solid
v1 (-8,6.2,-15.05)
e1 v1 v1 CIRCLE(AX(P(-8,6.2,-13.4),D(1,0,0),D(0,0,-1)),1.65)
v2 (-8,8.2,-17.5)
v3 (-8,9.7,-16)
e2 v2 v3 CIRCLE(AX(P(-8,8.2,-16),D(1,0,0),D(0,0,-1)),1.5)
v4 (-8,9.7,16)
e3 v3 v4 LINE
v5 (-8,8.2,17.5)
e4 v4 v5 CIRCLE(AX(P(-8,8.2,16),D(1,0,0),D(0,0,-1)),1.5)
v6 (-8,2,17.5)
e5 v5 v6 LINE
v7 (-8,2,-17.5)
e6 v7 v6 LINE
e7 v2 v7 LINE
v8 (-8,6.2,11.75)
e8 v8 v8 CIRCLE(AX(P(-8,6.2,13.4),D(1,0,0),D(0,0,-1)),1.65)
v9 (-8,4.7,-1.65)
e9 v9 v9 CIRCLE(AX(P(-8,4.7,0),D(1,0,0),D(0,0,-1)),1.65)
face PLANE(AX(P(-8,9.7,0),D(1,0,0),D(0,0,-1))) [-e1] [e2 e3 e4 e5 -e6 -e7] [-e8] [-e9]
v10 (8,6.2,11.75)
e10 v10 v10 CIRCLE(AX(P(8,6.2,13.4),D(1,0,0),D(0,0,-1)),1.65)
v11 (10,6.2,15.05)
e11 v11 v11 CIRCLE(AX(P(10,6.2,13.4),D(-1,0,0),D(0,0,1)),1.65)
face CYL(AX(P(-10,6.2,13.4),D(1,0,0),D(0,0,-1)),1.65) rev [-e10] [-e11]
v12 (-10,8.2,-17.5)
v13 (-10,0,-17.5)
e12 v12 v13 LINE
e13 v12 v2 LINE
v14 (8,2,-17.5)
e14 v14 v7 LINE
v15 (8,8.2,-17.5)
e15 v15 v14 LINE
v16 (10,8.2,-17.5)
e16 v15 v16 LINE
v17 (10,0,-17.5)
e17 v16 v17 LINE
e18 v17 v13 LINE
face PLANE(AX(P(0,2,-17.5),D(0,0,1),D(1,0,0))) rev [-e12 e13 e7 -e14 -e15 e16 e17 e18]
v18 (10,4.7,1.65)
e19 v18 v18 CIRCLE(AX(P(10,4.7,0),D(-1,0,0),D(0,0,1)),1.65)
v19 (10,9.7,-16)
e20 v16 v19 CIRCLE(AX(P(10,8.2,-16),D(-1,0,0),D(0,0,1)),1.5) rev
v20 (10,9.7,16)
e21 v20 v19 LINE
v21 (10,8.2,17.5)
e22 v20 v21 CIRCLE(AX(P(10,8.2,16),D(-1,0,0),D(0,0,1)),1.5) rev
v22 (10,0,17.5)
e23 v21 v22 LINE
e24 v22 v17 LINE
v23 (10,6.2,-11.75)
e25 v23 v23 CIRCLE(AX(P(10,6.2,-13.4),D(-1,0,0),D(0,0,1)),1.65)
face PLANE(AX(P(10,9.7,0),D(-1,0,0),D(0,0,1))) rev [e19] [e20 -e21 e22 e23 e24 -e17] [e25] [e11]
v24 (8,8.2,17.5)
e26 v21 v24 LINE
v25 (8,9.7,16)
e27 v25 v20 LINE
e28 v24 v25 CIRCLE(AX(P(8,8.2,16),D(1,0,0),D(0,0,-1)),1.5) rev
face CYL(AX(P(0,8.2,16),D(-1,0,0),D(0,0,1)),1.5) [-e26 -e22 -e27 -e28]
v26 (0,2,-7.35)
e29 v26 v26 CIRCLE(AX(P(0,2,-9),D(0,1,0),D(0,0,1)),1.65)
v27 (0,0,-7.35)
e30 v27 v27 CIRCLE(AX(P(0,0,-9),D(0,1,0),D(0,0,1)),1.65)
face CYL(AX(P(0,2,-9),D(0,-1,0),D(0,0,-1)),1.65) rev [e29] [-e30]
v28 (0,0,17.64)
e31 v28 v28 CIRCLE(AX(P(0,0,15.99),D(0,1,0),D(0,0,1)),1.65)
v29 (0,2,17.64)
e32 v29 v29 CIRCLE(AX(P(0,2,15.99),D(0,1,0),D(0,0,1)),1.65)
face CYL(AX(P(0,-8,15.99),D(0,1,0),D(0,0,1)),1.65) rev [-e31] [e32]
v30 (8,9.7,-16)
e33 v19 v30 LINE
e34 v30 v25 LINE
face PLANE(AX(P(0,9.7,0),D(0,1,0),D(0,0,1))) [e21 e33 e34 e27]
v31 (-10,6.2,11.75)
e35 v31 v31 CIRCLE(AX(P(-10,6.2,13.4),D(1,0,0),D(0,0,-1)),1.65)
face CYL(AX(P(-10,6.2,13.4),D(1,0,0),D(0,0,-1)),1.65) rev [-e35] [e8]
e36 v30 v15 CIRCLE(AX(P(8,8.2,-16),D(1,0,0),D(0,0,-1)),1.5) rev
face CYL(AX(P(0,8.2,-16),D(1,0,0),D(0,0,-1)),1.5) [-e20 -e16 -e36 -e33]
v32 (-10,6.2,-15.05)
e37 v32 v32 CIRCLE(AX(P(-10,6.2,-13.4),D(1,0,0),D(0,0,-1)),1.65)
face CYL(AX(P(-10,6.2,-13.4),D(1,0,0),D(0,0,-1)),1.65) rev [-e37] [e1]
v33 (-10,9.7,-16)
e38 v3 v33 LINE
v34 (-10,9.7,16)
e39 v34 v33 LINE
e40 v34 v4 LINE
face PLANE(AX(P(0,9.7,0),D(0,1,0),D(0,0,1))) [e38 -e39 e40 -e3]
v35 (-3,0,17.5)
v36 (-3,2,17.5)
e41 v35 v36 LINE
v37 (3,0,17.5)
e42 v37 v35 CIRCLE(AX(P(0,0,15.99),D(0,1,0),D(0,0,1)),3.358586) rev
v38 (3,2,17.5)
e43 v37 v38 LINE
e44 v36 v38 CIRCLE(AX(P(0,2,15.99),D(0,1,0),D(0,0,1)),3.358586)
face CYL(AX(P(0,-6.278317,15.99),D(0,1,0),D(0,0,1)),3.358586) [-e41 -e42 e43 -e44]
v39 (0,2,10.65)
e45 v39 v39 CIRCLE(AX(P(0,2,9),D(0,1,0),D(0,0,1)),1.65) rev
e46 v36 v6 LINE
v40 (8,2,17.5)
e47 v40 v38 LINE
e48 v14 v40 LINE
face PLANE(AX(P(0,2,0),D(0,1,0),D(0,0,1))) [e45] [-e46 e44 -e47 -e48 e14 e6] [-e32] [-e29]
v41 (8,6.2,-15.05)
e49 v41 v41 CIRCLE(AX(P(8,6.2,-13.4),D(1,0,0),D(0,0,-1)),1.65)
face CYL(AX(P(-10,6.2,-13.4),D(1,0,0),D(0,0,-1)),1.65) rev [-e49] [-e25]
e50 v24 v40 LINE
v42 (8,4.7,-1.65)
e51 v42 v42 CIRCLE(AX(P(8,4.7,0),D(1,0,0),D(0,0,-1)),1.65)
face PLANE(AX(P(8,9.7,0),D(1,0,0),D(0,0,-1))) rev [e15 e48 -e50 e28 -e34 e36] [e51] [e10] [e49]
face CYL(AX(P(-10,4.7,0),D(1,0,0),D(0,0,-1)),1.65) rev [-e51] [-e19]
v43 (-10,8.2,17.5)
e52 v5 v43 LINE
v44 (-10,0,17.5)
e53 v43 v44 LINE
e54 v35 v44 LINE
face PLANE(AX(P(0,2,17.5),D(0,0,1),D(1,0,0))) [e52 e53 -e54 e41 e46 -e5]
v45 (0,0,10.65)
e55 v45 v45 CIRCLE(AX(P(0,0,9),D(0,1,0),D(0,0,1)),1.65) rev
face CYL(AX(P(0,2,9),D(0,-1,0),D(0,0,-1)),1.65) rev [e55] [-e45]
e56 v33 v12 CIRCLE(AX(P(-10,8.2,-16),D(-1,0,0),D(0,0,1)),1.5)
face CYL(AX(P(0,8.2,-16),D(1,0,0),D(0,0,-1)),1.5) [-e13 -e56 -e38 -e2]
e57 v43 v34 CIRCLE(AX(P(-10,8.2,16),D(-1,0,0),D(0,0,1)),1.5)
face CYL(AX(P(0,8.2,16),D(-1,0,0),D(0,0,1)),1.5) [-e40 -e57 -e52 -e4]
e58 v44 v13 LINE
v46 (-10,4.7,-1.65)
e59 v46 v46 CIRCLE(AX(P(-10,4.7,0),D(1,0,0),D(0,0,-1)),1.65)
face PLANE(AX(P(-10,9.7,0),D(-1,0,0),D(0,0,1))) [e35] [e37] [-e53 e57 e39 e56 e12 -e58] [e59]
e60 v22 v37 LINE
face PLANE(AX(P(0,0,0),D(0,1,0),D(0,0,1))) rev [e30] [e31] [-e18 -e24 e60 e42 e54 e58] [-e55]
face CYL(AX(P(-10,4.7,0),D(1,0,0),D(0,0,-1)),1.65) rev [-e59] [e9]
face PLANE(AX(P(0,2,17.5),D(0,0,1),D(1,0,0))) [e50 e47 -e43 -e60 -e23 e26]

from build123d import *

# Parameters (mm, degrees)
IZIM1_W                     = 16
IZIM1_H                     = 35
IZIM1_R                     = 1.65
Y_KSEKLIK_EKSTR_ZYON1_DEPTH = 2
IZIM3_W                     = 2
IZIM3_H                     = 35
Y_KSEKLIK_EKSTR_ZYON2_DEPTH = 9.7
RADYUS1_R                   = 1.5
KES_EKSTR_ZYON1_DEPTH       = 2
KES_EKSTR_ZYON1_2_DEPTH     = 2
KES_EKSTR_ZYON1_START       = -20
KES_EKSTR_ZYON1_3_OUTLINE_R = 1.65
KES_EKSTR_ZYON1_3_DEPTH     = 20


# Read off the part's stored shape, not the designer's step: Kes-Ekstrüzyon1
with BuildPart() as part:
    # Çizim1 → Yükseklik-Ekstrüzyon1 (new body)
    with BuildSketch(Plane(origin=(0, 0, 0), x_dir=(1, 0, 0), z_dir=(0, 1, 0))):
        Rectangle(IZIM1_W, IZIM1_H)
        with Locations(Location((0, -9, 0), (0, 0, 270))):
            Circle(IZIM1_R, mode=Mode.SUBTRACT)
        with Locations(Location((0, 9, 0), (0, 0, 270))):
            Circle(IZIM1_R, mode=Mode.SUBTRACT)
    extrude(amount=Y_KSEKLIK_EKSTR_ZYON1_DEPTH)

    # Çizim3 → Yükseklik-Ekstrüzyon2 (add)
    with BuildSketch(Plane(origin=(0, 0, 0), x_dir=(1, 0, 0), z_dir=(0, 1, 0))):
        with Locations((9, 0)):
            Rectangle(IZIM3_W, IZIM3_H)
        with Locations((-9, 0)):
            Rectangle(IZIM3_W, IZIM3_H)
    extrude(amount=Y_KSEKLIK_EKSTR_ZYON2_DEPTH)

    # Radyus1
    radyus1_edges = [part.edges().sort_by_distance(p)[0] for p in [
        (9, 9.7, 17.5),
        (9, 9.7, -17.5),
        (-9, 9.7, 17.5),
        (-9, 9.7, -17.5),
    ]]
    fillet(radyus1_edges, radius=RADYUS1_R)

    # Kes-Ekstrüzyon1 outline → Kes-Ekstrüzyon1 (add)
    with BuildSketch(Plane(origin=(0, 0, 0), x_dir=(1, 0, 0), z_dir=(0, 1, 0))):
        with BuildLine():
            ThreePointArc((0.665131566, -17.5), (0, -17.64), (-0.665131566, -17.5))
            Line((-0.665131566, -17.5), (-3, -17.5))
            ThreePointArc((-3, -17.5), (0, -19.348586012), (3, -17.5))
            Line((3, -17.5), (0.665131566, -17.5))
        make_face()
    extrude(amount=KES_EKSTR_ZYON1_DEPTH)

    # Kes-Ekstr_zyon1 2 outline → Kes-Ekstr_zyon1 2 (cut)
    with BuildSketch(Plane(origin=(0, 0, 0), x_dir=(1, 0, 0), z_dir=(0, 1, 0))):
        with BuildLine():
            ThreePointArc((0.665131566, -17.5), (0, -14.34), (-0.665131566, -17.5))
            Line((-0.665131566, -17.5), (0.665131566, -17.5))
        make_face()
    extrude(amount=KES_EKSTR_ZYON1_2_DEPTH, mode=Mode.SUBTRACT)

    # Kes-Ekstr_zyon1 3 outline → Kes-Ekstr_zyon1 3 (cut)
    with BuildSketch(Plane(origin=(10, 0, 0), x_dir=(0, 0, -1), z_dir=(1, 0, 0)).offset(KES_EKSTR_ZYON1_START)):
        with Locations((-13.4, 6.2)):
            Circle(KES_EKSTR_ZYON1_3_OUTLINE_R)
        with Locations((0, 4.7)):
            Circle(KES_EKSTR_ZYON1_3_OUTLINE_R)
        with Locations((13.4, 6.2)):
            Circle(KES_EKSTR_ZYON1_3_OUTLINE_R)
    extrude(amount=KES_EKSTR_ZYON1_3_DEPTH, mode=Mode.SUBTRACT)


solid = part.part
